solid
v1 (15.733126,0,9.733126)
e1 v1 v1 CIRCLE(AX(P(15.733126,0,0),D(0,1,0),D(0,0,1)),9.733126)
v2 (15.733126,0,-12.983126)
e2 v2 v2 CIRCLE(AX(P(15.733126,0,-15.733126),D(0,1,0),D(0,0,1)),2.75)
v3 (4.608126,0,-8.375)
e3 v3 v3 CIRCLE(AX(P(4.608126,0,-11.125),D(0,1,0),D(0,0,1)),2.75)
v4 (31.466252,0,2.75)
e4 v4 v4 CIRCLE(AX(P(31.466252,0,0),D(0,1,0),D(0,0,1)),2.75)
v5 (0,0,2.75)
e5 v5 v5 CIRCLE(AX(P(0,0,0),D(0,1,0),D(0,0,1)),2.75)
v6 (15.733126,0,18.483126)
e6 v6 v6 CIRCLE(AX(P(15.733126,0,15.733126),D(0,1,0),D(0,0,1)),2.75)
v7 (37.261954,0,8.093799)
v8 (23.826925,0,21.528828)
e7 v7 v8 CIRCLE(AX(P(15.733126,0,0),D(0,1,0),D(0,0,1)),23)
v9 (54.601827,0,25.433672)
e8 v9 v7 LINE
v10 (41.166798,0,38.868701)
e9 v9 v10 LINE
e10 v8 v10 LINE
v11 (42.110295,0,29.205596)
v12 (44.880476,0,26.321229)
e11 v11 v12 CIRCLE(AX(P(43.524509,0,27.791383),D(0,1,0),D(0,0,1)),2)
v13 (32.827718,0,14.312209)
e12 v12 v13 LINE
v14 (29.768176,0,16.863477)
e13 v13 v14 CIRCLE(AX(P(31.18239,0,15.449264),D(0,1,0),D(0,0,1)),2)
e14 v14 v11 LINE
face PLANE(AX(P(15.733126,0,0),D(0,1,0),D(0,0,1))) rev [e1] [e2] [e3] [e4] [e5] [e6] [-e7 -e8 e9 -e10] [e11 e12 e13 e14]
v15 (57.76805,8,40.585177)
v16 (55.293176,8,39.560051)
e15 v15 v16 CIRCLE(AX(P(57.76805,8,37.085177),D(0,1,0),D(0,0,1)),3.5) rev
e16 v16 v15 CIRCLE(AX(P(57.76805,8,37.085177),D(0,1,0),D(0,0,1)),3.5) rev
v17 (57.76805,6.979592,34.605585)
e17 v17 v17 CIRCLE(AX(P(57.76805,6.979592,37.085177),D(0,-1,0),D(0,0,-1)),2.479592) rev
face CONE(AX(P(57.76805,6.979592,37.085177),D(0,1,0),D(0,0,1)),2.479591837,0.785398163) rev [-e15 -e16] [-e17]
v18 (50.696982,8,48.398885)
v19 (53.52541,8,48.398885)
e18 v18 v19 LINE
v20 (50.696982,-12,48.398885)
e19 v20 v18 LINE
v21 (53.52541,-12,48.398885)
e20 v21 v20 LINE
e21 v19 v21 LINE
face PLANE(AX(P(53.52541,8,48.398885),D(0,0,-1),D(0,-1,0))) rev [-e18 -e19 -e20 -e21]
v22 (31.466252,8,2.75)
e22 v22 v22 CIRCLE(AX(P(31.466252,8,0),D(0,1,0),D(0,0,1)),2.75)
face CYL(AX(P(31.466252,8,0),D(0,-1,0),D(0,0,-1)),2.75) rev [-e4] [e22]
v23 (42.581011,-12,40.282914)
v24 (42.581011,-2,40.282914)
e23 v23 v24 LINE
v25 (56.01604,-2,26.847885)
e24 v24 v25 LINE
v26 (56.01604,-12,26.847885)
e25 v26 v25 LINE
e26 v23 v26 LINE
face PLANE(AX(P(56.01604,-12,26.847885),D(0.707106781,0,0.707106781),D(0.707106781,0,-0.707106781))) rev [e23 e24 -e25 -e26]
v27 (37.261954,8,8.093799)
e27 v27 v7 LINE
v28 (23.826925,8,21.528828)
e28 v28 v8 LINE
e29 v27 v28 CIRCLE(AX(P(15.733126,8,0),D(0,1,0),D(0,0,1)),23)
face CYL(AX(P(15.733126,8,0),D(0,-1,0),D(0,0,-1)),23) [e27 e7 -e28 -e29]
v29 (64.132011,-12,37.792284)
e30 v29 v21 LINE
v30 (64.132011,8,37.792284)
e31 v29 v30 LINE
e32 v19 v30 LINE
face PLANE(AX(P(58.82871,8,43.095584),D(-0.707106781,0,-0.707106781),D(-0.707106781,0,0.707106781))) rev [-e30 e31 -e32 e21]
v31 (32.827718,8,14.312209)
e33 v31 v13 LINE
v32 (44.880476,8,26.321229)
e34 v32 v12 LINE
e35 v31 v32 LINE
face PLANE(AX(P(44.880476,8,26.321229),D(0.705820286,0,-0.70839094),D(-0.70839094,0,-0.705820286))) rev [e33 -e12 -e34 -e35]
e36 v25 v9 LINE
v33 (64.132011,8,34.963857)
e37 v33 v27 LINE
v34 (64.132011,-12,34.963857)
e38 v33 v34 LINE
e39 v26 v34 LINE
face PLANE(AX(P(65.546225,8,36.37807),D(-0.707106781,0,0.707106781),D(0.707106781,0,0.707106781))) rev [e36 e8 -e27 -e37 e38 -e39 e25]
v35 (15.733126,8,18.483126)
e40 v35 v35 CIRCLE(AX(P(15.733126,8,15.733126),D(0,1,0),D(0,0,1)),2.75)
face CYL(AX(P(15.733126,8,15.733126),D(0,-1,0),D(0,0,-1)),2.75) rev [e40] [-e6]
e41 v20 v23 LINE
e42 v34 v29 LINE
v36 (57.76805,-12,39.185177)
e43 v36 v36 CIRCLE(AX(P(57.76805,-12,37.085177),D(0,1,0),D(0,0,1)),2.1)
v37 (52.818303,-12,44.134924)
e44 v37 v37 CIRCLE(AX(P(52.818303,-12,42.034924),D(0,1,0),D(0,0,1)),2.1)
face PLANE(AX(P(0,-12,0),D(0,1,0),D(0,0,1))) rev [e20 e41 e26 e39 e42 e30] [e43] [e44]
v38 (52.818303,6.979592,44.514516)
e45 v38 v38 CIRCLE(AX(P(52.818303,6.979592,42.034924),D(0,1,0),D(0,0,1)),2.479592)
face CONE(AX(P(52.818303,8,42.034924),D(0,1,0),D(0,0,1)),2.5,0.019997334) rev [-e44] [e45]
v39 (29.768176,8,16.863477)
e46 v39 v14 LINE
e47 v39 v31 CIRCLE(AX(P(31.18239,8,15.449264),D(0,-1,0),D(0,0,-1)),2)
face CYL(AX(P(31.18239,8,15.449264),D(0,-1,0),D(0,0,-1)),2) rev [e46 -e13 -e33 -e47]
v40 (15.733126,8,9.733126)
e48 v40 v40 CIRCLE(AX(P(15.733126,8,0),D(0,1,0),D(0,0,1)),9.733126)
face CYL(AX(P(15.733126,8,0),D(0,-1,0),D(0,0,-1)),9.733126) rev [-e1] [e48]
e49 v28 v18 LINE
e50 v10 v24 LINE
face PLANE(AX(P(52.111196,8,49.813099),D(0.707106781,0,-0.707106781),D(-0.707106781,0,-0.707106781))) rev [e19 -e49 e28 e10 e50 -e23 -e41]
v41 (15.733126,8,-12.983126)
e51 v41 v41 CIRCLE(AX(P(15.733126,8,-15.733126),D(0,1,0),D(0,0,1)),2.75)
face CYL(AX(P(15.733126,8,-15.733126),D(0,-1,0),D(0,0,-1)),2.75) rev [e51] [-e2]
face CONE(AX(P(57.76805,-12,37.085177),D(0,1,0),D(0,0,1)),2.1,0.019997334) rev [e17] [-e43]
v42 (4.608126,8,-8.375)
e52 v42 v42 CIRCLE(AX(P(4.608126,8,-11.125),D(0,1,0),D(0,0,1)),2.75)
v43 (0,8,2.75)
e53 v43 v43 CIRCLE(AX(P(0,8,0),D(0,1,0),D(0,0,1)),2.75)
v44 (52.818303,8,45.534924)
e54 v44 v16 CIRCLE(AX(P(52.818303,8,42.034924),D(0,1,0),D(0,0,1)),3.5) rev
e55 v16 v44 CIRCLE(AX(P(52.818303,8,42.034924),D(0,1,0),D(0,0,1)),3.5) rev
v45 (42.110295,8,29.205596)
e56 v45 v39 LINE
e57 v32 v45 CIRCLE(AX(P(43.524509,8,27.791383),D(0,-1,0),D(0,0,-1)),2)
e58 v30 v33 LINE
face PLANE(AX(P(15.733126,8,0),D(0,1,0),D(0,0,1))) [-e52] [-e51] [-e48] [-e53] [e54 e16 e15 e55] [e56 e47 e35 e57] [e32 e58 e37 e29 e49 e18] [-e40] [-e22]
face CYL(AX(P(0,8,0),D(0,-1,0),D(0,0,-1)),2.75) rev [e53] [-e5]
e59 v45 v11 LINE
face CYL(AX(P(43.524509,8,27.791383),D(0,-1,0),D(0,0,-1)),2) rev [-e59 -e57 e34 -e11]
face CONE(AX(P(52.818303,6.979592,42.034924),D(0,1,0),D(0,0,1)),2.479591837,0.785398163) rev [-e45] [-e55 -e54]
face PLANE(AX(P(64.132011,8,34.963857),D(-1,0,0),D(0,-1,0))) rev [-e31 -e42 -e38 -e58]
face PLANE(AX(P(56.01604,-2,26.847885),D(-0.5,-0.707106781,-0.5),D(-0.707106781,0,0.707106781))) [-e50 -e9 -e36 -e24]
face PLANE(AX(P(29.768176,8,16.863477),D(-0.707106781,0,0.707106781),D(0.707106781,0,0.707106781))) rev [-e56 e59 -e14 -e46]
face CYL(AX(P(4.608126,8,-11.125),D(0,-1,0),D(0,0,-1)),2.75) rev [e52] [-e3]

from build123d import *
from OCP.BRepFilletAPI import BRepFilletAPI_MakeChamfer

# Parameters (mm, degrees)
SKETCH2_R               = 2.75
SKETCH2_R_2             = 9.733125881
BOSS_EXTRUDE1_DEPTH     = 8
CHAMFER1_SIZE           = 2
BOSS_EXTRUDE3_DEPTH     = 12
CHAMFER2_SIZE           = 2
CUT_EXTRUDE2_DEPTH      = 82.236487908
CUT_EXTRUDE2_DEPTH_BACK = 82.236487908
CHAMFER3_SIZE           = 1
CHAMFER3_SIZE_2         = 1.020612224


with BuildPart() as part:
    # Sketch2 → Boss-Extrude1 (new body)
    with BuildSketch(Plane(origin=(0, 0, 0), x_dir=(1, 0, 0), z_dir=(0, 1, 0))):
        with BuildLine():
            Line((58.828710372, -43.095584491), (65.546224794, -36.37807007))
            Line((65.546224794, -36.37807007), (37.261953546, -8.093798822))
            ThreePointArc((37.261953546, -8.093798822), (-0.530330086, 16.263455967), (23.826924704, -21.528827665))
            Line((23.826924704, -21.528827665), (52.111195951, -49.813098912))
            Line((52.111195951, -49.813098912), (58.828710372, -43.095584491))
        make_face()
        with Locations(Location((0, 0, 0), (0, 0, 270))):
            Circle(SKETCH2_R, mode=Mode.SUBTRACT)
        with Locations(Location((31.466251763, 0, 0), (0, 0, 270))):
            Circle(SKETCH2_R, mode=Mode.SUBTRACT)
        with Locations(Location((15.733125881, 15.733125881, 0), (0, 0, 270))):
            Circle(SKETCH2_R, mode=Mode.SUBTRACT)
        with Locations(Location((15.733125881, -15.733125881, 0), (0, 0, 270))):
            Circle(SKETCH2_R, mode=Mode.SUBTRACT)
        with Locations(Location((4.608125881, 11.125, 0), (0, 0, 270))):
            Circle(SKETCH2_R, mode=Mode.SUBTRACT)
        with Locations(Location((15.733125881, 0, 0), (0, 0, 270))):
            Circle(SKETCH2_R_2, mode=Mode.SUBTRACT)
    extrude(amount=BOSS_EXTRUDE1_DEPTH)

    # Chamfer1
    chamfer1_edges = [part.edges().sort_by_distance(p)[0] for p in [
        (65.546224794, 4, 36.37807007),
        (52.111195951, 4, 49.813098912),
    ]]
    chamfer(chamfer1_edges, length=CHAMFER1_SIZE)

    # Sketch7 → Boss-Extrude3 (add)
    with BuildSketch(Plane(origin=(0, 0, 0), x_dir=(-1, 0, 0), z_dir=(0, -1, 0))):
        Polygon((-53.525409514, -48.39888535), (-64.132011231, -37.792283632), (-64.132011231, -34.963856507), (-56.016040068, -26.847885344), (-42.581011226, -40.282914187), (-50.696982389, -48.39888535), align=None)
    extrude(amount=BOSS_EXTRUDE3_DEPTH)

    # Sketch8 → Cut-Revolve2 (revolve, cut)
    with BuildSketch(Plane(origin=(47.426613526, 0, 47.426613526), x_dir=(0.7071067811865475, 0, -0.7071067811865477), z_dir=(0.7071067811865477, 0, 0.7071067811865475)), mode=Mode.PRIVATE) as cut_revolve2_sk:
        Polygon((5.525, -12), (5.125, 8), (7.625, 8), (7.625, -12), align=None)
    revolve(cut_revolve2_sk.sketch.rotate(Axis((52.818302732, 8, 42.034924319), (0, -1, 0)), 315), axis=Axis((52.818302732, 8, 42.034924319), (0, -1, 0)), mode=Mode.SUBTRACT)

    # Sketch9 → Cut-Revolve3 (revolve, cut)
    with BuildSketch(Plane(origin=(47.426613526, 0, 47.426613526), x_dir=(0.7071067811865475, 0, -0.7071067811865477), z_dir=(0.7071067811865477, 0, 0.7071067811865475)), mode=Mode.PRIVATE) as cut_revolve3_sk:
        Polygon((14.625, -12), (16.725, -12), (17.125, 8), (14.625, 8), align=None)
    revolve(cut_revolve3_sk.sketch.rotate(Axis((57.768050201, 8, 37.085176851), (0, -1, 0)), 135), axis=Axis((57.768050201, 8, 37.085176851), (0, -1, 0)), mode=Mode.SUBTRACT)

    # Chamfer2
    chamfer2_edges = [part.edges().sort_by_distance(p)[0] for p in [
        (49.298525647, 0, 33.565399766),
    ]]
    chamfer(chamfer2_edges, length=CHAMFER2_SIZE)

    # Sketch10 → Cut-Extrude2 (cut, two sides: drawn at the far end of the back side and taken through both)
    with BuildSketch(Plane.XZ.offset(-CUT_EXTRUDE2_DEPTH_BACK)):
        with BuildLine():
            Line((29.768176219, 16.863477462), (42.110295184, 29.205596427))
            ThreePointArc((42.110295184, 29.205596427), (44.966986546, 29.176755666), (44.880476019, 26.321228875))
            Line((44.880476019, 26.321228875), (32.827718409, 14.312209061))
            ThreePointArc((32.827718409, 14.312209061), (29.901532194, 13.913228795), (29.768176219, 16.863477462))
        make_face()
    extrude(amount=CUT_EXTRUDE2_DEPTH + CUT_EXTRUDE2_DEPTH_BACK, mode=Mode.SUBTRACT)

    # Chamfer3
    chamfer3_edges_1 = [part.edges().sort_by_distance(p)[0] for p in [
        (52.818302732, 8, 39.534924319),
    ]]
    chamfer3_side_1 = [part.faces().sort_by_distance(p)[0] for p in [
        (52.818302732, 8, 39.514924319),
    ]]
    chamfer3_edges_2 = [part.edges().sort_by_distance(p)[0] for p in [
        (57.768050201, 8, 34.585176851),
    ]]
    chamfer3_side_2 = [part.faces().sort_by_distance(p)[0] for p in [
        (57.768050201, 8, 34.565176851),
    ]]
    chamfer3 = BRepFilletAPI_MakeChamfer(part.part.solid().wrapped)
    for e in chamfer3_edges_1:
        chamfer3.Add(CHAMFER3_SIZE - 0.0001, CHAMFER3_SIZE_2 - 0.0001, e.wrapped, chamfer3_side_1[0].wrapped)
    for e in chamfer3_edges_2:
        chamfer3.Add(CHAMFER3_SIZE - 0.0001, CHAMFER3_SIZE_2 - 0.0001, e.wrapped, chamfer3_side_2[0].wrapped)
    add(Compound.cast(chamfer3.Shape()), mode=Mode.REPLACE)  # a hair under: the kernel refuses the full size


solid = part.part
